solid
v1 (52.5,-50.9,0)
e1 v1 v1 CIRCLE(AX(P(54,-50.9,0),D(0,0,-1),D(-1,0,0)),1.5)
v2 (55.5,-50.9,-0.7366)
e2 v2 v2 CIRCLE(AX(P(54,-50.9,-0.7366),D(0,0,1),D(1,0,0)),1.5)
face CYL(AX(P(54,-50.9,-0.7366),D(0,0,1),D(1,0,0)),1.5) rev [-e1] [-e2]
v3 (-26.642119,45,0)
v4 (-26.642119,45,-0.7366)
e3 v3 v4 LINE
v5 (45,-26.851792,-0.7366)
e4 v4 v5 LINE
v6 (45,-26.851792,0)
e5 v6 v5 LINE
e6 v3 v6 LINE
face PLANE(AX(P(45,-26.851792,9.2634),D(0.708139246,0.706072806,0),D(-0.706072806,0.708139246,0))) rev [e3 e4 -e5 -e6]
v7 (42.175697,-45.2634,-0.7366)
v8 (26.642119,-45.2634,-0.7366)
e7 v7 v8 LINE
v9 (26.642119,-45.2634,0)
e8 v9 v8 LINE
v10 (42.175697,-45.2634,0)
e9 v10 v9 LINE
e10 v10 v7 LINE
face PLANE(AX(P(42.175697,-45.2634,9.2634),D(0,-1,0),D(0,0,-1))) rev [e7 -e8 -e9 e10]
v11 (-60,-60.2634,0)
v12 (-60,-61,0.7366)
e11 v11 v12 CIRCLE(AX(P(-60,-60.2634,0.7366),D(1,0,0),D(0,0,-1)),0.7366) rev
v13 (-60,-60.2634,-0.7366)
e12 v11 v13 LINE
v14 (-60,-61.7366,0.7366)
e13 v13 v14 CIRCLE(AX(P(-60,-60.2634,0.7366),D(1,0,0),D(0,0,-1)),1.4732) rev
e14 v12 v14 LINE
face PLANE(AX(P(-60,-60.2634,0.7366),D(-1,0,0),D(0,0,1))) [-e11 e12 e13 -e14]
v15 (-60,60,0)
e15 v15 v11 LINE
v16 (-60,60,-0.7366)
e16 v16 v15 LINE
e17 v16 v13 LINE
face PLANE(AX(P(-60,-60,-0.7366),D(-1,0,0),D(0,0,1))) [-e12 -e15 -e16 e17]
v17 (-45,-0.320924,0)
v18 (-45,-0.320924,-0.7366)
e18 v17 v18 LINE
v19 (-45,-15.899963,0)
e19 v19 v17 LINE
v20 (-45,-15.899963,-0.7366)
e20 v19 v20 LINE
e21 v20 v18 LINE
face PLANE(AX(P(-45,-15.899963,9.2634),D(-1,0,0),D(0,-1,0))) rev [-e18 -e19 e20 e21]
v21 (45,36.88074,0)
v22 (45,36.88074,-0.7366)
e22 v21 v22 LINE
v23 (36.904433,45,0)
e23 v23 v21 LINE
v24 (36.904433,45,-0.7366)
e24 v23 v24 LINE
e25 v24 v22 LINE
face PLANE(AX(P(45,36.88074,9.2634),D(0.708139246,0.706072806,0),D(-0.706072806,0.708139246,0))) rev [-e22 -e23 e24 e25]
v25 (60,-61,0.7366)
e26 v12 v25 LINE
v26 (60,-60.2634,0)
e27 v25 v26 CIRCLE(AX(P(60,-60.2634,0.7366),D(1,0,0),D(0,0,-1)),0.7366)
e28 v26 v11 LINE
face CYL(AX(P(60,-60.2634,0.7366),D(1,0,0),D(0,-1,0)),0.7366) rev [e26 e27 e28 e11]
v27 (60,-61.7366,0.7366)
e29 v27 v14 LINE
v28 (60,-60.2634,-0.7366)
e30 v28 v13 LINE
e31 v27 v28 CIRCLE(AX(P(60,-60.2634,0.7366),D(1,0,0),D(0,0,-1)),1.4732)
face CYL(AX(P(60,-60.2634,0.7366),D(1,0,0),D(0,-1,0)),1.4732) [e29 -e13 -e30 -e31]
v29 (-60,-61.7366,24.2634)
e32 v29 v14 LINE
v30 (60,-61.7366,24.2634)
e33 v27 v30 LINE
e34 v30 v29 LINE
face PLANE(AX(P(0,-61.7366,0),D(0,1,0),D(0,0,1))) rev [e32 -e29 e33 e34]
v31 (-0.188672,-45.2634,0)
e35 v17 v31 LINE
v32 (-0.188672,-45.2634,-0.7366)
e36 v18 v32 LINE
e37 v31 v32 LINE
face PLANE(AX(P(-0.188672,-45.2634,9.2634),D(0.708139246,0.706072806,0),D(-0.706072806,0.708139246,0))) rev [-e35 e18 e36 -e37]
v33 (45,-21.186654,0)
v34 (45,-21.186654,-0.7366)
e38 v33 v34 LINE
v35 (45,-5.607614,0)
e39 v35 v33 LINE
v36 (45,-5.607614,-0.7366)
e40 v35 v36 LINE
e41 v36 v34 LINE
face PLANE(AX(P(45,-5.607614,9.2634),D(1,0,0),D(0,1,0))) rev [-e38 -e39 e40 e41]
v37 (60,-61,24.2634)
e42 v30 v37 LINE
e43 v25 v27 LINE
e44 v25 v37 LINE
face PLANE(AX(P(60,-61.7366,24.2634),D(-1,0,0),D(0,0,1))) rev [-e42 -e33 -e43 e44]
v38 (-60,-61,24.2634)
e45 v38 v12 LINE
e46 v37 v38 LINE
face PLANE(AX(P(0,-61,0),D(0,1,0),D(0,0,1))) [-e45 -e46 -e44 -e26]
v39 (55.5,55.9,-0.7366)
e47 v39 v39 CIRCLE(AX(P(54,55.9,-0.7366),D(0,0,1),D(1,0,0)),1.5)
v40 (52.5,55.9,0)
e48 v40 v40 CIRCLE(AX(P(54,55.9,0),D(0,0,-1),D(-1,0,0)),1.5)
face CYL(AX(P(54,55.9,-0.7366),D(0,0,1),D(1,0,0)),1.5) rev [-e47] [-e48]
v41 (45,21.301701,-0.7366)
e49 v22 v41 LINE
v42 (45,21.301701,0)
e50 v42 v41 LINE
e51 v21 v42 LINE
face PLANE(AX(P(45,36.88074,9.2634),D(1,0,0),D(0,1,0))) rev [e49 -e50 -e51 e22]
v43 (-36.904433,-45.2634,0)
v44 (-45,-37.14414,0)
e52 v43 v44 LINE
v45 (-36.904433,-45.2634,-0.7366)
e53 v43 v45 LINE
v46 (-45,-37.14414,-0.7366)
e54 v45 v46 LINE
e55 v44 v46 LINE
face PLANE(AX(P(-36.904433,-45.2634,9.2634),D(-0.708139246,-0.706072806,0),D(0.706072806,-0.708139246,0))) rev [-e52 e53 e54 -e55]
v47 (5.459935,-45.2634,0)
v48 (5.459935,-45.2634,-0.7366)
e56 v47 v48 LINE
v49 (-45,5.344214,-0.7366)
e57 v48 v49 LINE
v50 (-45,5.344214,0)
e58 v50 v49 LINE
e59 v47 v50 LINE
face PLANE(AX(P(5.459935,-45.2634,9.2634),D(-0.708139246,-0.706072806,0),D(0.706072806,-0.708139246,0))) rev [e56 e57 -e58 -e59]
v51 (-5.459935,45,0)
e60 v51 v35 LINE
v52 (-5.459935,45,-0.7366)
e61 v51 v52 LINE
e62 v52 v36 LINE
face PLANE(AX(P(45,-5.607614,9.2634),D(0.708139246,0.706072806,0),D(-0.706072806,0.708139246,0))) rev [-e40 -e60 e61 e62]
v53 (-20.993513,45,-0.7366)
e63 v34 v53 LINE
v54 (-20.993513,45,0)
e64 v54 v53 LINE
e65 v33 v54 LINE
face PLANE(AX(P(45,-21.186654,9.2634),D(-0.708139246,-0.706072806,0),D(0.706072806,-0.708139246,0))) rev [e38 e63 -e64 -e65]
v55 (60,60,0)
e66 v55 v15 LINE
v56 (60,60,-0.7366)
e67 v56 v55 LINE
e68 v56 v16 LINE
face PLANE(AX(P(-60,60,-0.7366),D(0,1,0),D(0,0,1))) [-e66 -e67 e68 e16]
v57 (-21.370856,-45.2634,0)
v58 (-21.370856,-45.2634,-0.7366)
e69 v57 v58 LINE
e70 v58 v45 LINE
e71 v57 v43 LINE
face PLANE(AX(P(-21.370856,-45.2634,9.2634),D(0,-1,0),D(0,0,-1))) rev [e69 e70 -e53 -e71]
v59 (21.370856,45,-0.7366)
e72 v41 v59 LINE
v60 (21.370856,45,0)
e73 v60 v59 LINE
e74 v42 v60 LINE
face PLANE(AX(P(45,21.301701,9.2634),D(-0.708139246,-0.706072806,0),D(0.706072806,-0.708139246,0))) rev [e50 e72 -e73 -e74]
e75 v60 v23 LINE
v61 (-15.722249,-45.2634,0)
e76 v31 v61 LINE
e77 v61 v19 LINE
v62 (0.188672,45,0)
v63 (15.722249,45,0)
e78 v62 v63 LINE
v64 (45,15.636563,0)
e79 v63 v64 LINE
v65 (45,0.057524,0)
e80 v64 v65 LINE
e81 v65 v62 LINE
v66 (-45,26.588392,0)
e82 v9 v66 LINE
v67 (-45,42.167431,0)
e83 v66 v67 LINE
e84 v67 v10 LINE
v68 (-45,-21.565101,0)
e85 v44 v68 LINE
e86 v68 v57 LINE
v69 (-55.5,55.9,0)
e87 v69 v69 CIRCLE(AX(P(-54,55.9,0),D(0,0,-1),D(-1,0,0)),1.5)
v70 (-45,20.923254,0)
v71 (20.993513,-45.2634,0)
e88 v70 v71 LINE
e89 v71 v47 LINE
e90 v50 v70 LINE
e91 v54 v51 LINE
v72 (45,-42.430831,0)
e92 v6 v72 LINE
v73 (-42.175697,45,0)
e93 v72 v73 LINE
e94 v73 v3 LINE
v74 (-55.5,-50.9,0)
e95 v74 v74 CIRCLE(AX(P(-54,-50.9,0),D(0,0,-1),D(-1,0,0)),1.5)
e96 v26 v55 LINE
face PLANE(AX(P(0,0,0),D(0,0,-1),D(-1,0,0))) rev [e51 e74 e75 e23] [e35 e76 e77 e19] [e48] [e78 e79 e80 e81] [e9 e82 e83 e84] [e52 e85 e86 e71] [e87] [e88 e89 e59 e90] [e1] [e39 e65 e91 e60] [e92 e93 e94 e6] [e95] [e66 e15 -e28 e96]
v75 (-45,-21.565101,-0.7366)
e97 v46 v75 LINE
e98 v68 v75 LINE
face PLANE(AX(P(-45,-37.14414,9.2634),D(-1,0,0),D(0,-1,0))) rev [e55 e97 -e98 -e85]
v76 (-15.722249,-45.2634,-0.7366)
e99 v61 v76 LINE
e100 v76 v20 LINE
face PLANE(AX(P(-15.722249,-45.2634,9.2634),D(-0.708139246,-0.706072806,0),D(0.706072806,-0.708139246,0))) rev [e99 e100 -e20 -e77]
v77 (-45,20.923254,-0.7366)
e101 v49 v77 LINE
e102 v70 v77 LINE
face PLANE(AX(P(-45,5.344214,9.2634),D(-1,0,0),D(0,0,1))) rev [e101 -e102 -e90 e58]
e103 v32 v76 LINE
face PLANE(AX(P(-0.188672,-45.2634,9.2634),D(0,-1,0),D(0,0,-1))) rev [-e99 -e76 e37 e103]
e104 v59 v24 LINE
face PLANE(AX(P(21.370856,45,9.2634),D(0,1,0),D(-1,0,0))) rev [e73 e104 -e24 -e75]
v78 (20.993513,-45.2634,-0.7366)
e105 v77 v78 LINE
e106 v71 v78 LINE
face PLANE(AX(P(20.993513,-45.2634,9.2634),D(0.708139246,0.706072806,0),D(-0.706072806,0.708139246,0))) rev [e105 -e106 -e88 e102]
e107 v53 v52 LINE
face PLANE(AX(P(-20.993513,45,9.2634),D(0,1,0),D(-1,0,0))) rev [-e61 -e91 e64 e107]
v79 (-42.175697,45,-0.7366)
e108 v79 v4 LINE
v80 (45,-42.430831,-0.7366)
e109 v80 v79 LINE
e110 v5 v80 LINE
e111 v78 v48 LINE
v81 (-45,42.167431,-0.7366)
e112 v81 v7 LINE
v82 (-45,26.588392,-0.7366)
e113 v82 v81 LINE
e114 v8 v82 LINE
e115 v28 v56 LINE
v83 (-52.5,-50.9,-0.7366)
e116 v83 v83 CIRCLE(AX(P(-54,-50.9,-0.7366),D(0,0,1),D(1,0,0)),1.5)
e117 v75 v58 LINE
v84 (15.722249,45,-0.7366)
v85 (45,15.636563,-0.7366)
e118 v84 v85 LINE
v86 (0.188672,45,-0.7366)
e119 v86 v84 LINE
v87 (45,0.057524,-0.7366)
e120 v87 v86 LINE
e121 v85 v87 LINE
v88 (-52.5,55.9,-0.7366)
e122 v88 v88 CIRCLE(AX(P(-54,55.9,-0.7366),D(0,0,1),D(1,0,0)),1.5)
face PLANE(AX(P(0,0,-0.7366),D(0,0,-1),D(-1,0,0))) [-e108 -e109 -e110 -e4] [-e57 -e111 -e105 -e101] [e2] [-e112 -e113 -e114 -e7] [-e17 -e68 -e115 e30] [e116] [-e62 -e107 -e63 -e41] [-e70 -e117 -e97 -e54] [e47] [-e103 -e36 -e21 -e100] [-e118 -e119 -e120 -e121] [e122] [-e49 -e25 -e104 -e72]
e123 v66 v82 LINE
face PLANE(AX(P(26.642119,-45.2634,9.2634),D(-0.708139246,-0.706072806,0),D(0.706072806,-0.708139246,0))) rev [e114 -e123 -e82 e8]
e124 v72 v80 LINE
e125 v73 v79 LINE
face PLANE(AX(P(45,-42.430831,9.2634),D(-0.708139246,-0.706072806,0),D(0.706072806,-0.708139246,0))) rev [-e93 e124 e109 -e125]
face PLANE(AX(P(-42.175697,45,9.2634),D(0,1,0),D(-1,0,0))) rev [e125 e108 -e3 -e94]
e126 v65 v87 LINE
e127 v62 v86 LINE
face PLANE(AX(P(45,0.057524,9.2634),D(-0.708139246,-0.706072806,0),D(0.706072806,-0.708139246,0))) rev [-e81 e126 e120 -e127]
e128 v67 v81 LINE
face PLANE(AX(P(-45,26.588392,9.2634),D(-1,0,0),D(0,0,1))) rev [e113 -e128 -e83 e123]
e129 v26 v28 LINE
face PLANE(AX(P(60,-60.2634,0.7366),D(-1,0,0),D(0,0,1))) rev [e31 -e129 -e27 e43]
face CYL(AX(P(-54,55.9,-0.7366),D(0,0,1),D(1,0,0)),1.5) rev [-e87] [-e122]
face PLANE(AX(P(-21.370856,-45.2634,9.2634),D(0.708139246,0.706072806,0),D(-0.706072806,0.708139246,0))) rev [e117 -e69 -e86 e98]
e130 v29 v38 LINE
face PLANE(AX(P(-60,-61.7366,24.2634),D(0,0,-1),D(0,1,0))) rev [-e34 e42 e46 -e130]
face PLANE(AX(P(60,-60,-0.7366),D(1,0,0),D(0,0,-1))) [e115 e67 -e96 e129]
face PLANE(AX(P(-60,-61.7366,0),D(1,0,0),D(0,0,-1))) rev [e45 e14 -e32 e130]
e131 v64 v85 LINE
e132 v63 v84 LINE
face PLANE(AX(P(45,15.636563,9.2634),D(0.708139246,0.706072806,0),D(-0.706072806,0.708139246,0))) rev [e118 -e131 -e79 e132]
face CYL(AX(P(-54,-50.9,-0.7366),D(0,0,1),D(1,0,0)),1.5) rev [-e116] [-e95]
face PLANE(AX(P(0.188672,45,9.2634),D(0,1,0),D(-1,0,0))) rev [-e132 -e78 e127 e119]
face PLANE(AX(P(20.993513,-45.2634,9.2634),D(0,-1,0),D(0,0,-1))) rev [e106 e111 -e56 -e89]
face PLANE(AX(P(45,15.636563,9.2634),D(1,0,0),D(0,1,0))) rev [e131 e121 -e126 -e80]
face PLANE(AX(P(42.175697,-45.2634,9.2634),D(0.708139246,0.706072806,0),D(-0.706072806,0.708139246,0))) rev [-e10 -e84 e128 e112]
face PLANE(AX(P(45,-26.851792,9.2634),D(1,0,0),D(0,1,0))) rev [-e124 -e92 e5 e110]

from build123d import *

# Parameters (mm, degrees)
SKETCH1_W          = 120
SKETCH1_H          = 120
BASE_FLANGE1_DEPTH = 0.7366
EDGE_FLANGE1_DEPTH = 120
SKETCH25_R         = 1.5
CUT_EXTRUDE1_DEPTH = 161.891420775
CUT_EXTRUDE2_DEPTH = 10


# Sheet-metal steps are written as plain solids
with BuildPart() as part:
    # Sketch1 → Base-Flange1 (new body)
    with BuildSketch(Plane.XY):
        Rectangle(SKETCH1_W, SKETCH1_H)
    extrude(amount=-BASE_FLANGE1_DEPTH)

    # Edge-Flange1 section (across the edge) → Edge-Flange1 (add)
    with BuildSketch(Plane(origin=(-60, -61, 0), x_dir=(0, 1, 0), z_dir=(1, 0, 0))):
        with BuildLine():
            Line((-0.7366, 0.7366), (-0.7366, 24.2634))
            Line((-0.7366, 24.2634), (0, 24.2634))
            Line((0, 24.2634), (0, 0.7366))
            ThreePointArc((0, 0.7366), (0.215745145, 0.215745145), (0.7366, 0))
            Line((0.7366, 0), (1, 0))
            Line((1, 0), (1, -0.7366))
            Line((1, -0.7366), (0.7366, -0.7366))
            ThreePointArc((0.7366, -0.7366), (-0.30510971, -0.30510971), (-0.7366, 0.7366))
        make_face()
    extrude(amount=EDGE_FLANGE1_DEPTH)

    # Sketch25 → Cut-Extrude1 (cut, through all)
    with BuildSketch(Plane(origin=(-46.34767359, -57.645882303, 26.3866), x_dir=(1, 0, 0), z_dir=(0, 0, 1))):
        with Locations((-7.65232641, 6.745882303)):
            Circle(SKETCH25_R)
        with Locations((100.34767359, 113.545882303)):
            Circle(SKETCH25_R)
        with Locations((100.34767359, 6.745882303)):
            Circle(SKETCH25_R)
        with Locations((-7.65232641, 113.545882303)):
            Circle(SKETCH25_R)
    extrude(amount=-CUT_EXTRUDE1_DEPTH, mode=Mode.SUBTRACT)

    # Sketch26 → Cut-Extrude2 (cut)
    with BuildSketch(Plane(origin=(0, 0, -0.7366), x_dir=(-1, 0, 0), z_dir=(0, 0, -1))):
        Polygon((45, -15.899963077), (45, -0.320923852), (0.188671673, -45.2634), (15.722249294, -45.2634), align=None)
        Polygon((21.370855866, -45.2634), (36.904433487, -45.2634), (45, -37.144140463), (45, -21.565101238), align=None)
        Polygon((-20.993512521, -45.2634), (-5.459934899, -45.2634), (45, 5.344214309), (45, 20.923253534), align=None)
        Polygon((-45, -26.851791695), (-45, -42.43083092), (42.175696714, 45), (26.642119093, 45), align=None)
        Polygon((-45, -5.607614309), (-45, -21.186653534), (20.993512521, 45), (5.459934899, 45), align=None)
        Polygon((-45, 15.636563077), (-45, 0.057523852), (-0.188671673, 45), (-15.722249294, 45), align=None)
        Polygon((-45, 36.880740463), (-45, 21.301701238), (-21.370855866, 45), (-36.904433487, 45), align=None)
        Polygon((45, 26.588391695), (45, 42.16743092), (-42.175696714, -45.2634), (-26.642119093, -45.2634), align=None)
    extrude(amount=-CUT_EXTRUDE2_DEPTH, mode=Mode.SUBTRACT)


solid = part.part
